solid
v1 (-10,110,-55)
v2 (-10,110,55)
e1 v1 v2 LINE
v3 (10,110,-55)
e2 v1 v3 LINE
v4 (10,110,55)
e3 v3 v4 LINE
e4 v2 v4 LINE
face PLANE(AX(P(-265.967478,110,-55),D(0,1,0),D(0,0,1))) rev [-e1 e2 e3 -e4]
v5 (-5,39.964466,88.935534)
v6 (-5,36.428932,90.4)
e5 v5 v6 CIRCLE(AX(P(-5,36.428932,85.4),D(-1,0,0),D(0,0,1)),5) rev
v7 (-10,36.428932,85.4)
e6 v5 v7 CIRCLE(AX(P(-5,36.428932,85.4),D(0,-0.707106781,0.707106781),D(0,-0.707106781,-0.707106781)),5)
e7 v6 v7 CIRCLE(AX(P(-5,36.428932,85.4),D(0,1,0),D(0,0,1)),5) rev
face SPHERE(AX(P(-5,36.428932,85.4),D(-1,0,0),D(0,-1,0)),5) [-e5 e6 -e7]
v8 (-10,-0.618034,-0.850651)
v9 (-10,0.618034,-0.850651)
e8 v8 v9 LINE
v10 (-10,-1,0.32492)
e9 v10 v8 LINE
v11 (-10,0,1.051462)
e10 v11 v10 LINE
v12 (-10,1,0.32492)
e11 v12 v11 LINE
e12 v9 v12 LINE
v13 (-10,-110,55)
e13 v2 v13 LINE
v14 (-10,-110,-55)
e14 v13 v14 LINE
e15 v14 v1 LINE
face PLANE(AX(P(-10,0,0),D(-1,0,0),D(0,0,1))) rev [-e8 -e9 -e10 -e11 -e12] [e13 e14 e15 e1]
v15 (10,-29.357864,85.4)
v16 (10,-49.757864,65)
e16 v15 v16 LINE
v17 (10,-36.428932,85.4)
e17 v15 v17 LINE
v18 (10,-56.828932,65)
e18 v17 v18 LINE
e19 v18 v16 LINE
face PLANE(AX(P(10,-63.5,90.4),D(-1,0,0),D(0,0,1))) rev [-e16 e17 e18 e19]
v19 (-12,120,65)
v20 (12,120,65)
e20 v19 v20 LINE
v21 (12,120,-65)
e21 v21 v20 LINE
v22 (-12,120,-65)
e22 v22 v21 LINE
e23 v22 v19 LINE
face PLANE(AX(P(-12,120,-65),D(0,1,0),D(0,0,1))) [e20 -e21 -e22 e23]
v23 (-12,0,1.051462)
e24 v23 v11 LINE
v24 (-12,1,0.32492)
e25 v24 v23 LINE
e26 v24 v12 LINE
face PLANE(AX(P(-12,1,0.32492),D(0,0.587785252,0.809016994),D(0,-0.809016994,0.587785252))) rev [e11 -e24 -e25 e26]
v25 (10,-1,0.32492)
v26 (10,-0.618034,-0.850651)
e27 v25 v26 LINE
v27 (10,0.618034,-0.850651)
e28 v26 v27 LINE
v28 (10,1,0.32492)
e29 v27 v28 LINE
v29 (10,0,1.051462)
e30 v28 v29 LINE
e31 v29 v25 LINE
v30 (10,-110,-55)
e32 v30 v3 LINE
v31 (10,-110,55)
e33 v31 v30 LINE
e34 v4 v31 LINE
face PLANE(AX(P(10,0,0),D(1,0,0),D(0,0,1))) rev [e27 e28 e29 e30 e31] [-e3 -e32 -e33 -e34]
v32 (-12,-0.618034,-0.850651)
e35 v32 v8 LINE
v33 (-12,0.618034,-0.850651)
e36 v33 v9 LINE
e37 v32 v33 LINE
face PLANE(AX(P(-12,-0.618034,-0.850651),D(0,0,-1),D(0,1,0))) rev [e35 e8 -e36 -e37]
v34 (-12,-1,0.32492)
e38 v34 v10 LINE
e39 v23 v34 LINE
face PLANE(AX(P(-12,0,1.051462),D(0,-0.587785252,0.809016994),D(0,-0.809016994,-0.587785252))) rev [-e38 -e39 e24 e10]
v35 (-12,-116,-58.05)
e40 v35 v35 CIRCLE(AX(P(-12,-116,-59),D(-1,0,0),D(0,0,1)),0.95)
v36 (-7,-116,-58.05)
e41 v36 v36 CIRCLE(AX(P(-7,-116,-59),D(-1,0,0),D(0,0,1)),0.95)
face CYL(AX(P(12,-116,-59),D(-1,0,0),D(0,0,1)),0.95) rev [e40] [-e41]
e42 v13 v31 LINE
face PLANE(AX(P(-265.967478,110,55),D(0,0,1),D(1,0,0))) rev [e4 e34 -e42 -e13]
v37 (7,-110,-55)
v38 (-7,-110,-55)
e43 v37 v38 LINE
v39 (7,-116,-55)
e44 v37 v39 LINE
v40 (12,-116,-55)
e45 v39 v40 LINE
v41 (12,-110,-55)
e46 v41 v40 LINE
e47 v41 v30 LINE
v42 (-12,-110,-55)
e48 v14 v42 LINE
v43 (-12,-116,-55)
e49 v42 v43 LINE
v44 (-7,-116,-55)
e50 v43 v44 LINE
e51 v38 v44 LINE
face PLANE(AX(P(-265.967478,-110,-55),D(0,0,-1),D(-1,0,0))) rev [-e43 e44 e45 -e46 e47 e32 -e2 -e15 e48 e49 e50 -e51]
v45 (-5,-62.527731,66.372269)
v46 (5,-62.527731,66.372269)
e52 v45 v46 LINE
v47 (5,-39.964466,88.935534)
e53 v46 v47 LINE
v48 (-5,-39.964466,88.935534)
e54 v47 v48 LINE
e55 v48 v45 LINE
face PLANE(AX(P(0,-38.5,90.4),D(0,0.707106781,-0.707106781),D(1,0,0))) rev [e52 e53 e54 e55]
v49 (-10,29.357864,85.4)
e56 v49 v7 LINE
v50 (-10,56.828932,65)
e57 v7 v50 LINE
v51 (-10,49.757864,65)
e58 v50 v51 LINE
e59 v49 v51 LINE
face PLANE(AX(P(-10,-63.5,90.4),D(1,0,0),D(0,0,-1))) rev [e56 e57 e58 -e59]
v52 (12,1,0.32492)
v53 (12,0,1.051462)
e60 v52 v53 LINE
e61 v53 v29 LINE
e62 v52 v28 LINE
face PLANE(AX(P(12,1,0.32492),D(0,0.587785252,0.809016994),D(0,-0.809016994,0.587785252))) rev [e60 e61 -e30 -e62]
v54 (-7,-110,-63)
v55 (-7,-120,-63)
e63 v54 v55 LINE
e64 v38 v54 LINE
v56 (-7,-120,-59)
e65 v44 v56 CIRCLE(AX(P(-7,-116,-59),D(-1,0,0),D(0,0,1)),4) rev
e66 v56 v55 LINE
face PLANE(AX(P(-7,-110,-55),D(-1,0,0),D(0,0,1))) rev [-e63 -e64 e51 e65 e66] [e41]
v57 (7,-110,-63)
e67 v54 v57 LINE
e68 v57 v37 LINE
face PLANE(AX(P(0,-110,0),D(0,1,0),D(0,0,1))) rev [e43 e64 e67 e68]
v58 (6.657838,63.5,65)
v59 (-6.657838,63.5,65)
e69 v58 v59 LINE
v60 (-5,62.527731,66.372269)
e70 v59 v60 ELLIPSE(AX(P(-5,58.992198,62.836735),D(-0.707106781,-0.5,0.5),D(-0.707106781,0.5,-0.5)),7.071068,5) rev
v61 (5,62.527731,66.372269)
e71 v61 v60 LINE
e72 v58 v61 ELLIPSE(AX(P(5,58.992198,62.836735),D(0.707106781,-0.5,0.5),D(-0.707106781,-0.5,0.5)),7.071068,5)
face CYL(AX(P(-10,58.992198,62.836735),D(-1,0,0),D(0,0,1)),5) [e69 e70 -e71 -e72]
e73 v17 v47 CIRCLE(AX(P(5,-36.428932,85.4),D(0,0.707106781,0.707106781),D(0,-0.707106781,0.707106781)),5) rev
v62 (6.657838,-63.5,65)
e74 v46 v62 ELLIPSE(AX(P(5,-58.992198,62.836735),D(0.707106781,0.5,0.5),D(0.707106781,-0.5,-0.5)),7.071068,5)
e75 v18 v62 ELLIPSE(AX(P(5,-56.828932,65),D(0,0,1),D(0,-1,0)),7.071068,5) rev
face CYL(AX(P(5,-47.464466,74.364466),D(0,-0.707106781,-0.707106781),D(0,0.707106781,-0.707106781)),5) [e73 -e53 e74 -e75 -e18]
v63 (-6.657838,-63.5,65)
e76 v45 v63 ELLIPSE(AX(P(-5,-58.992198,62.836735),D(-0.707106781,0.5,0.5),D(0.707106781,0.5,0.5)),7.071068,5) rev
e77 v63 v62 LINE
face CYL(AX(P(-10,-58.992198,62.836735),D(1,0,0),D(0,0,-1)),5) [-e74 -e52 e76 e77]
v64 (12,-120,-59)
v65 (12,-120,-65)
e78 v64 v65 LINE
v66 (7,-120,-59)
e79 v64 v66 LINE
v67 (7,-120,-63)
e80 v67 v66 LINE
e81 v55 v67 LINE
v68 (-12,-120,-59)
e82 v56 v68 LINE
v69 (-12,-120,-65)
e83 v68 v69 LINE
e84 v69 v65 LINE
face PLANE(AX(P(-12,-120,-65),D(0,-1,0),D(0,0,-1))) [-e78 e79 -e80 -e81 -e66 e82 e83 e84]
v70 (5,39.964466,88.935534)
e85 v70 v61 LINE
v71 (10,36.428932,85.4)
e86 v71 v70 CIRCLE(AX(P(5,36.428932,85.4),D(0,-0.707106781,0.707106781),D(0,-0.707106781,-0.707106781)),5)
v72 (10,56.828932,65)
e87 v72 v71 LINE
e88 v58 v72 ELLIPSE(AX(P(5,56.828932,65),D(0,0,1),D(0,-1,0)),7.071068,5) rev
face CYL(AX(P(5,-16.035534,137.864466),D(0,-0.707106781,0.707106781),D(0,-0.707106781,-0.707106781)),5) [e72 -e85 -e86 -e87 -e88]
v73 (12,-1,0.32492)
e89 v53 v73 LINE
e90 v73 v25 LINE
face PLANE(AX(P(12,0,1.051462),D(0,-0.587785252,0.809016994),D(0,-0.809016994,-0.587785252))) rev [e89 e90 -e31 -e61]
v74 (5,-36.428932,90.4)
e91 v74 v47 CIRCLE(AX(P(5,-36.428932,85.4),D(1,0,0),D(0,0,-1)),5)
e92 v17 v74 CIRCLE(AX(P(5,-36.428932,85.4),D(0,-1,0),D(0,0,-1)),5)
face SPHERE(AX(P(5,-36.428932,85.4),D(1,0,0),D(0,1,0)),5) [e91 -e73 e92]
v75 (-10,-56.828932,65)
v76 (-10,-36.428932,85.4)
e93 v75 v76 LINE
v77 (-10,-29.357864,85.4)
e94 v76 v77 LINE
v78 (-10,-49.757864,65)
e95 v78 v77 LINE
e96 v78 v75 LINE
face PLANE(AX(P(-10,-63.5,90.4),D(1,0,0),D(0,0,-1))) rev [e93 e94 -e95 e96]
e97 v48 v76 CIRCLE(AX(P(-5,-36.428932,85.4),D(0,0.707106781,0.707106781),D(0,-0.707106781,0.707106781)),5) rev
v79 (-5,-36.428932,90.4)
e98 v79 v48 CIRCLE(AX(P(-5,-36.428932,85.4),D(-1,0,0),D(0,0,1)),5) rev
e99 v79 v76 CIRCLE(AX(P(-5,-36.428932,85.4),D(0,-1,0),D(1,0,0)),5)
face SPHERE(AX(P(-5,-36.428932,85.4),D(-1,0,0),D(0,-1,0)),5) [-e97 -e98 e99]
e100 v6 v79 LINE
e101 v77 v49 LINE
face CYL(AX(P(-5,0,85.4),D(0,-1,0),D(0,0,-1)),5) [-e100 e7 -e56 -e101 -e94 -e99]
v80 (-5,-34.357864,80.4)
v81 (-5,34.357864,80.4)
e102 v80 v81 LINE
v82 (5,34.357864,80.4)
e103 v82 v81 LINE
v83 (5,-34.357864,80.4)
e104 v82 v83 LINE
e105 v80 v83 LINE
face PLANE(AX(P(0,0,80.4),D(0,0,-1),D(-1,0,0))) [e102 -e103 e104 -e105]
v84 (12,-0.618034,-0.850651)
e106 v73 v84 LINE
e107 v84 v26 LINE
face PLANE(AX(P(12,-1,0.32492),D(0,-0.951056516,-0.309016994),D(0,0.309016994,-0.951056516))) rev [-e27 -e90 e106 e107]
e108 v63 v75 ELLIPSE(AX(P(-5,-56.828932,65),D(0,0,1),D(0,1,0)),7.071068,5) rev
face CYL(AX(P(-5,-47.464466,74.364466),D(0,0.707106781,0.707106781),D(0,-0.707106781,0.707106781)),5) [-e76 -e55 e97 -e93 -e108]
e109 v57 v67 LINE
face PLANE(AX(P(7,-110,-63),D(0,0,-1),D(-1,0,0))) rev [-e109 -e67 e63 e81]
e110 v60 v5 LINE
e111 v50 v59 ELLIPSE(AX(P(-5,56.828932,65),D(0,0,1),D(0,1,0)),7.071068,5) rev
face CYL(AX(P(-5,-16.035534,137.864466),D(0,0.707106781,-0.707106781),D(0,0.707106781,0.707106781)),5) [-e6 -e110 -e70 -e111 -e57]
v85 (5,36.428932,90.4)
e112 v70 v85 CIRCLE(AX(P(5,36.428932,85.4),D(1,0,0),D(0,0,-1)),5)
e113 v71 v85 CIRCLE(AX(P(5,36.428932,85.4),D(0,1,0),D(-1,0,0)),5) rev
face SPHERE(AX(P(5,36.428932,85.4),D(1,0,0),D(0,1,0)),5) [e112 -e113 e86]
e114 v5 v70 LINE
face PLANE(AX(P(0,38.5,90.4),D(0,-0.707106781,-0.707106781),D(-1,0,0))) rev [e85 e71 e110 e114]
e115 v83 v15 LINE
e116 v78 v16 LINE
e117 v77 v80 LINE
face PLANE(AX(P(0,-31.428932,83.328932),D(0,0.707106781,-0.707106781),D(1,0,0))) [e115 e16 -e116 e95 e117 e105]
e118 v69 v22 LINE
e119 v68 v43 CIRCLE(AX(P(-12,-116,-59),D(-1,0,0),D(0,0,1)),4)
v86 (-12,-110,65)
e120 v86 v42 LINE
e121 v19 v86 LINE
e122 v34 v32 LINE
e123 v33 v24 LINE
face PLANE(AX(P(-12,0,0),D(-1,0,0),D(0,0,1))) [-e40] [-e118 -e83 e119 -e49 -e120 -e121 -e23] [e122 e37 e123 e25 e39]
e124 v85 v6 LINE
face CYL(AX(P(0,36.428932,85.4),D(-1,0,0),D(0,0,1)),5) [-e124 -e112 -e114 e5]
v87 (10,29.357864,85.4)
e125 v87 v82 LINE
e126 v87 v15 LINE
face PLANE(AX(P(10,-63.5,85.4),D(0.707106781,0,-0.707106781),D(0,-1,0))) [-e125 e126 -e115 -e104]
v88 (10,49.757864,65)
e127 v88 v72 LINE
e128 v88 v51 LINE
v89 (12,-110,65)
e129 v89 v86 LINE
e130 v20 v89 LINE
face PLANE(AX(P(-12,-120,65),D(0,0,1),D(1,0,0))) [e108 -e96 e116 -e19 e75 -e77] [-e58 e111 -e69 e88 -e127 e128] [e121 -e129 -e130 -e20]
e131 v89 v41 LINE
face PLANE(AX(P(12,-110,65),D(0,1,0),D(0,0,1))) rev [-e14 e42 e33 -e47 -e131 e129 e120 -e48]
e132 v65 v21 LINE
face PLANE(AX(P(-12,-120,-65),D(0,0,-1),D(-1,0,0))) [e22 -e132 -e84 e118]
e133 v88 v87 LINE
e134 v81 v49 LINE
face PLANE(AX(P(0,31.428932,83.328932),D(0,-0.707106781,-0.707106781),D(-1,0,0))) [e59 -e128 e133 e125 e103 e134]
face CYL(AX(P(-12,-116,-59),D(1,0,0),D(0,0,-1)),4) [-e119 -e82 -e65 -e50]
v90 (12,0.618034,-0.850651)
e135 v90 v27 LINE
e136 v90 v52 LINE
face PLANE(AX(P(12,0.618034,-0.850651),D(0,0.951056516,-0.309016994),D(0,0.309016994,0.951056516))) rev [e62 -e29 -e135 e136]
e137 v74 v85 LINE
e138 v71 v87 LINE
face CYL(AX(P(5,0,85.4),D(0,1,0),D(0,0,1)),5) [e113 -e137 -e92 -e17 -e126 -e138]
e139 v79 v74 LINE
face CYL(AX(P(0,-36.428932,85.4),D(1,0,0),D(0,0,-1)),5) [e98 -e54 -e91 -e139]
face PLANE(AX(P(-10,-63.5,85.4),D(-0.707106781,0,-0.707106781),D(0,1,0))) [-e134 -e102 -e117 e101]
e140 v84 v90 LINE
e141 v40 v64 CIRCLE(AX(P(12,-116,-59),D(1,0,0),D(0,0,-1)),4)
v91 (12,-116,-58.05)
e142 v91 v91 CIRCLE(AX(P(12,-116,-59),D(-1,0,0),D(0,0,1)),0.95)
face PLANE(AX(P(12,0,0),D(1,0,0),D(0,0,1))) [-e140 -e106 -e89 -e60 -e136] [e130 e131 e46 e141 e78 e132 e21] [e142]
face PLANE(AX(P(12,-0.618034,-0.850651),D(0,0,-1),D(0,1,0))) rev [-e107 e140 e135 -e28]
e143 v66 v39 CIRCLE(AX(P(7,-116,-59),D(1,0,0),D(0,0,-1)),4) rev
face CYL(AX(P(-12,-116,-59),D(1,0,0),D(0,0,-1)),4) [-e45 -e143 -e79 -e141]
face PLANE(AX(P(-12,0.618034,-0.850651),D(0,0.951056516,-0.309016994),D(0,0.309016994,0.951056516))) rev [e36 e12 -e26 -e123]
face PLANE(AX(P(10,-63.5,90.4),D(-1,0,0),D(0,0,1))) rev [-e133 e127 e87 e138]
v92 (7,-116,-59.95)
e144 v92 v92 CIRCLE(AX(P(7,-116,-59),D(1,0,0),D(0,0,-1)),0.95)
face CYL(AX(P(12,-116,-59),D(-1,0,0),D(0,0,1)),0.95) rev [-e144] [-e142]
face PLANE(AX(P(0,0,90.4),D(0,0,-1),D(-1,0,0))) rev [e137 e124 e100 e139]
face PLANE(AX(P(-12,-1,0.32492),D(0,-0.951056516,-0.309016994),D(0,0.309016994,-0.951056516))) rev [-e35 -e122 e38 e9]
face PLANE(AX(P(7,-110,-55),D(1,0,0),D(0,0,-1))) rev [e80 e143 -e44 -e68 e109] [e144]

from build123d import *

# Parameters (mm, degrees)
SKETCH1_W           = 240
SKETCH1_H           = 130
BOSS_EXTRUDE1_DEPTH = 12
SKETCH2_W           = 220
SKETCH2_H           = 110
CUT_EXTRUDE2_DEPTH  = 10
CUT_EXTRUDE3_DEPTH  = 137.839321834
SKETCH4_W           = 20
SKETCH4_H           = 127
BOSS_EXTRUDE2_DEPTH = 25.4
CHAMFER1_SIZE       = 25
SHELL1_START        = -10
SHELL1_DEPTH        = 20
FILLET1_R           = 5
CHAMFER2_SIZE       = 5
SKETCH6_W           = 10
SKETCH6_H           = 120
CUT_EXTRUDE5_DEPTH  = 153.145193812
SKETCH9_W           = 14
SKETCH9_H           = 8
CUT_EXTRUDE7_DEPTH  = 10
SKETCH11_R          = 0.95
CUT_EXTRUDE8_DEPTH  = 153.145193812
FILLET3_R           = 4


with BuildPart() as part:
    # Sketch1 → Boss-Extrude1 (new body)
    with BuildSketch(Plane.YZ):
        Rectangle(SKETCH1_W, SKETCH1_H)
    extrude(amount=-BOSS_EXTRUDE1_DEPTH)

    # Sketch2 → Cut-Extrude2 (cut)
    with BuildSketch(Plane.YZ):
        Rectangle(SKETCH2_W, SKETCH2_H)
    extrude(amount=-CUT_EXTRUDE2_DEPTH, mode=Mode.SUBTRACT)

    # Sketch3 → Cut-Extrude3 (cut, through all)
    with BuildSketch(Plane.YZ.offset(-10)):
        Polygon((0, 1.051462224), (-1, 0.324919696), (-0.618033989, -0.850650808), (0.618033989, -0.850650808), (1, 0.324919696), align=None)
    extrude(amount=-CUT_EXTRUDE3_DEPTH, mode=Mode.SUBTRACT)

    # Mirror6: part across plane


with BuildPart() as part_1:
    add(part.part)
    add(part.part.mirror(Plane.ZY))

    # Sketch4 → Boss-Extrude2 (add)
    with BuildSketch(Plane.XY.offset(65)):
        Rectangle(SKETCH4_W, SKETCH4_H)
    extrude(amount=BOSS_EXTRUDE2_DEPTH)

    # Chamfer1
    chamfer1_edges = [part_1.edges().sort_by_distance(p)[0] for p in [
        (0, 63.5, 90.4),
        (0, -63.5, 90.4),
    ]]
    chamfer(chamfer1_edges, length=CHAMFER1_SIZE)

    # Shell1: read off the stored shape, not the designer's step
    # Shell1 outline → Shell1 (cut)
    with BuildSketch(Plane.YZ.offset(SHELL1_START)):
        Polygon((-49.757864376, 65), (49.757864376, 65), (34.357864376, 80.4), (-34.357864376, 80.4), align=None)
    extrude(amount=SHELL1_DEPTH, mode=Mode.SUBTRACT)

    # Fillet1
    # the kernel refuses this fillet: 5 mm, written as the material it takes off along each edge
    with BuildSketch(Plane(origin=(5, -36.428932188, 85.4), x_dir=(0, 0, 1), z_dir=(1, 0, 0))) as fillet1_piece_1_section:
        Polygon((0, 0), (FILLET1_R * 1.02, 0), (FILLET1_R * 1.02, FILLET1_R * 0.422497833621), (FILLET1_R * 0.72124891681, FILLET1_R * 0.72124891681), align=None)
    fillet1_piece_1 = extrude(amount=FILLET1_R * 1.02, mode=Mode.PRIVATE)
    fillet1_piece_1 = fillet1_piece_1 - Plane(origin=(5, -36.428932188, 85.4), x_dir=(0, 0.3826834323650898, -0.9238795325112867), z_dir=(1, 0, 0)) * Sphere(FILLET1_R, mode=Mode.PRIVATE)
    add(fillet1_piece_1, mode=Mode.SUBTRACT)
    with BuildSketch(Plane(origin=(-5, -36.428932188, 85.4), x_dir=(0, -0.7071067811865476, 0.7071067811865476), z_dir=(-1, 0, 0))) as fillet1_piece_2_section:
        Polygon((0, 0), (FILLET1_R * 1.02, 0), (FILLET1_R * 1.02, FILLET1_R * 0.422497833621), (FILLET1_R * 0.72124891681, FILLET1_R * 0.72124891681), align=None)
    fillet1_piece_2 = extrude(amount=FILLET1_R * 1.02, mode=Mode.PRIVATE)
    fillet1_piece_2 = fillet1_piece_2 - Plane(origin=(-5, -36.428932188, 85.4), x_dir=(0, 0.3826834323650898, -0.9238795325112867), z_dir=(-1, 0, 0)) * Sphere(FILLET1_R, mode=Mode.PRIVATE)
    add(fillet1_piece_2, mode=Mode.SUBTRACT)
    with BuildSketch(Plane(origin=(-5, 36.428932188, 85.4), x_dir=(0, 0.7071067811865476, 0.7071067811865476), z_dir=(-1, 0, 0))) as fillet1_piece_3_section:
        Polygon((0, 0), (FILLET1_R * 1.02, 0), (FILLET1_R * 1.02, -FILLET1_R * 0.422497833621), (FILLET1_R * 0.72124891681, -FILLET1_R * 0.72124891681), align=None)
    fillet1_piece_3 = extrude(amount=FILLET1_R * 1.02, mode=Mode.PRIVATE)
    fillet1_piece_3 = fillet1_piece_3 - Plane(origin=(-5, 36.428932188, 85.4), x_dir=(0, -0.3826834323650898, -0.9238795325112867), z_dir=(-1, 0, 0)) * Sphere(FILLET1_R, mode=Mode.PRIVATE)
    add(fillet1_piece_3, mode=Mode.SUBTRACT)
    with BuildSketch(Plane(origin=(5, 36.428932188, 85.4), x_dir=(0, 0, 1), z_dir=(1, 0, 0))) as fillet1_piece_4_section:
        Polygon((0, 0), (FILLET1_R * 1.02, 0), (FILLET1_R * 1.02, -FILLET1_R * 0.422497833621), (FILLET1_R * 0.72124891681, -FILLET1_R * 0.72124891681), align=None)
    fillet1_piece_4 = extrude(amount=FILLET1_R * 1.02, mode=Mode.PRIVATE)
    fillet1_piece_4 = fillet1_piece_4 - Plane(origin=(5, 36.428932188, 85.4), x_dir=(0, -0.3826834323650898, -0.9238795325112867), z_dir=(1, 0, 0)) * Sphere(FILLET1_R, mode=Mode.PRIVATE)
    add(fillet1_piece_4, mode=Mode.SUBTRACT)
    with BuildSketch(Plane(origin=(10, -72.338834765, 56.561165235), x_dir=(-1, 0, 0), z_dir=(0, 0.7071067811865476, 0.7071067811865476))) as fillet1_piece_5_section:
        with BuildLine():
            CenterArc((FILLET1_R, -FILLET1_R), FILLET1_R, 90, 90)
            Line((0, -FILLET1_R), (0, 0))
            Line((0, 0), (FILLET1_R, 0))
        make_face()
    fillet1_piece_5 = extrude(amount=45.784271247, mode=Mode.PRIVATE)
    fillet1_piece_5 = split(fillet1_piece_5, bisect_by=Plane(origin=(10, -72.338834765, 65), z_dir=(0, 0, 1)), keep=Keep.TOP, mode=Mode.PRIVATE)
    add(fillet1_piece_5, mode=Mode.SUBTRACT)
    with BuildSketch(Plane(origin=(-13.437488438, -63.5, 65.4), x_dir=(0, 0, -1), z_dir=(1, 0, 0)), Plane(origin=(13.437488438, 63.5, 65.4), x_dir=(0, 0, -1), z_dir=(-1, 0, 0))) as fillet1_piece_6:
        with BuildLine():
            CenterArc((2.563265352, 4.50780246), FILLET1_R, 225, 19.363951138)
            Line((-0.972268554, 0.972268554), (0, 0))
            Line((0, 0), (0.4, 0))
        make_face()
    extrude(amount=26.874976876, mode=Mode.SUBTRACT)
    with BuildSketch(Plane(origin=(-10, -72.338834765, 56.561165235), x_dir=(0, 0.7071067811865476, -0.7071067811865476), z_dir=(0, 0.7071067811865476, 0.7071067811865476))) as fillet1_piece_7_section:
        with BuildLine():
            CenterArc((FILLET1_R, -FILLET1_R), FILLET1_R, 90, 90)
            Line((0, -FILLET1_R), (0, 0))
            Line((0, 0), (FILLET1_R, 0))
        make_face()
    fillet1_piece_7 = extrude(amount=45.784271247, mode=Mode.PRIVATE)
    fillet1_piece_7 = split(fillet1_piece_7, bisect_by=Plane(origin=(-10, -72.338834765, 65), z_dir=(0, 0, 1)), keep=Keep.TOP, mode=Mode.PRIVATE)
    add(fillet1_piece_7, mode=Mode.SUBTRACT)
    with BuildSketch(Plane(origin=(-5, -38.5, 90.4), x_dir=(0, -0.7071067811865476, -0.7071067811865476), z_dir=(1, 0, 0))) as fillet1_piece_8:
        with BuildLine():
            CenterArc((FILLET1_R * 0.414213562373, FILLET1_R), FILLET1_R, 225, 45)
            Line((-FILLET1_R * 0.292893218813, FILLET1_R * 0.292893218813), (0, 0))
            Line((0, 0), (FILLET1_R * 0.414213562373, 0))
        make_face()
    extrude(amount=10, mode=Mode.SUBTRACT)
    with BuildSketch(Plane(origin=(-10, 36.428932188, 90.4), x_dir=(0, 0, -1), z_dir=(0, -1, 0)), Plane(origin=(10, -36.428932188, 90.4), x_dir=(0, 0, -1), z_dir=(0, 1, 0))) as fillet1_piece_9:
        with BuildLine():
            CenterArc((FILLET1_R, FILLET1_R), FILLET1_R, 180, 90)
            Line((0, FILLET1_R), (0, 0))
            Line((0, 0), (FILLET1_R, 0))
        make_face()
    extrude(amount=72.857864376, mode=Mode.SUBTRACT)
    with BuildSketch(Plane(origin=(5, 38.5, 90.4), x_dir=(0, -1, 0), z_dir=(-1, 0, 0))) as fillet1_piece_10:
        with BuildLine():
            CenterArc((FILLET1_R * 0.414213562373, -FILLET1_R), FILLET1_R, 90, 45)
            Line((-FILLET1_R * 0.292893218813, -FILLET1_R * 0.292893218813), (0, 0))
            Line((0, 0), (FILLET1_R * 0.414213562373, 0))
        make_face()
    extrude(amount=10, mode=Mode.SUBTRACT)
    with BuildSketch(Plane(origin=(-10, 72.338834765, 56.561165235), x_dir=(0, -0.7071067811865476, -0.7071067811865476), z_dir=(0, -0.7071067811865476, 0.7071067811865476))) as fillet1_piece_11_section:
        with BuildLine():
            CenterArc((FILLET1_R, FILLET1_R), FILLET1_R, 180, 90)
            Line((0, FILLET1_R), (0, 0))
            Line((0, 0), (FILLET1_R, 0))
        make_face()
    fillet1_piece_11 = extrude(amount=45.784271247, mode=Mode.PRIVATE)
    fillet1_piece_11 = split(fillet1_piece_11, bisect_by=Plane(origin=(-10, 72.338834765, 65), z_dir=(0, 0, 1)), keep=Keep.TOP, mode=Mode.PRIVATE)
    add(fillet1_piece_11, mode=Mode.SUBTRACT)
    with BuildSketch(Plane(origin=(10, 72.338834765, 56.561165235), x_dir=(0, -0.7071067811865476, -0.7071067811865476), z_dir=(0, -0.7071067811865476, 0.7071067811865476))) as fillet1_piece_12_section:
        with BuildLine():
            CenterArc((FILLET1_R, -FILLET1_R), FILLET1_R, 90, 90)
            Line((0, -FILLET1_R), (0, 0))
            Line((0, 0), (FILLET1_R, 0))
        make_face()
    fillet1_piece_12 = extrude(amount=45.784271247, mode=Mode.PRIVATE)
    fillet1_piece_12 = split(fillet1_piece_12, bisect_by=Plane(origin=(10, 72.338834765, 65), z_dir=(0, 0, 1)), keep=Keep.TOP, mode=Mode.PRIVATE)
    add(fillet1_piece_12, mode=Mode.SUBTRACT)

    # Chamfer2
    chamfer2_edges = [part_1.edges().sort_by_distance(p)[0] for p in [
        (10, 0, 80.4),
        (-10, 0, 80.4),
    ]]
    chamfer(chamfer2_edges, length=CHAMFER2_SIZE - 0.0001)  # a hair under: the kernel refuses the full size

    # Sketch6 → Cut-Extrude5 (cut, through all)
    with BuildSketch(Plane(origin=(-12, 0, 0), x_dir=(0, -1, 0), z_dir=(-1, 0, 0))):
        with Locations((115, 5)):
            Rectangle(SKETCH6_W, SKETCH6_H)
    extrude(amount=-CUT_EXTRUDE5_DEPTH, mode=Mode.SUBTRACT)

    # Sketch9 → Cut-Extrude7 (cut)
    with BuildSketch(Plane.XZ.offset(120)):
        with Locations((0, -59)):
            Rectangle(SKETCH9_W, SKETCH9_H)
    extrude(amount=-CUT_EXTRUDE7_DEPTH, mode=Mode.SUBTRACT)

    # Sketch11 → Cut-Extrude8 (cut, through all)
    with BuildSketch(Plane(origin=(-12, 0, 0), x_dir=(0, -1, 0), z_dir=(-1, 0, 0))):
        with Locations(Location((116, -59, 0), (0, 0, 90))):
            Circle(SKETCH11_R)
    extrude(amount=-CUT_EXTRUDE8_DEPTH, mode=Mode.SUBTRACT)

    # Fillet3
    fillet3_edges = [part_1.edges().sort_by_distance(p)[0] for p in [
        (9.5, -120, -55),
        (-9.5, -120, -55),
    ]]
    fillet(fillet3_edges, radius=FILLET3_R)


solid = part_1.part
